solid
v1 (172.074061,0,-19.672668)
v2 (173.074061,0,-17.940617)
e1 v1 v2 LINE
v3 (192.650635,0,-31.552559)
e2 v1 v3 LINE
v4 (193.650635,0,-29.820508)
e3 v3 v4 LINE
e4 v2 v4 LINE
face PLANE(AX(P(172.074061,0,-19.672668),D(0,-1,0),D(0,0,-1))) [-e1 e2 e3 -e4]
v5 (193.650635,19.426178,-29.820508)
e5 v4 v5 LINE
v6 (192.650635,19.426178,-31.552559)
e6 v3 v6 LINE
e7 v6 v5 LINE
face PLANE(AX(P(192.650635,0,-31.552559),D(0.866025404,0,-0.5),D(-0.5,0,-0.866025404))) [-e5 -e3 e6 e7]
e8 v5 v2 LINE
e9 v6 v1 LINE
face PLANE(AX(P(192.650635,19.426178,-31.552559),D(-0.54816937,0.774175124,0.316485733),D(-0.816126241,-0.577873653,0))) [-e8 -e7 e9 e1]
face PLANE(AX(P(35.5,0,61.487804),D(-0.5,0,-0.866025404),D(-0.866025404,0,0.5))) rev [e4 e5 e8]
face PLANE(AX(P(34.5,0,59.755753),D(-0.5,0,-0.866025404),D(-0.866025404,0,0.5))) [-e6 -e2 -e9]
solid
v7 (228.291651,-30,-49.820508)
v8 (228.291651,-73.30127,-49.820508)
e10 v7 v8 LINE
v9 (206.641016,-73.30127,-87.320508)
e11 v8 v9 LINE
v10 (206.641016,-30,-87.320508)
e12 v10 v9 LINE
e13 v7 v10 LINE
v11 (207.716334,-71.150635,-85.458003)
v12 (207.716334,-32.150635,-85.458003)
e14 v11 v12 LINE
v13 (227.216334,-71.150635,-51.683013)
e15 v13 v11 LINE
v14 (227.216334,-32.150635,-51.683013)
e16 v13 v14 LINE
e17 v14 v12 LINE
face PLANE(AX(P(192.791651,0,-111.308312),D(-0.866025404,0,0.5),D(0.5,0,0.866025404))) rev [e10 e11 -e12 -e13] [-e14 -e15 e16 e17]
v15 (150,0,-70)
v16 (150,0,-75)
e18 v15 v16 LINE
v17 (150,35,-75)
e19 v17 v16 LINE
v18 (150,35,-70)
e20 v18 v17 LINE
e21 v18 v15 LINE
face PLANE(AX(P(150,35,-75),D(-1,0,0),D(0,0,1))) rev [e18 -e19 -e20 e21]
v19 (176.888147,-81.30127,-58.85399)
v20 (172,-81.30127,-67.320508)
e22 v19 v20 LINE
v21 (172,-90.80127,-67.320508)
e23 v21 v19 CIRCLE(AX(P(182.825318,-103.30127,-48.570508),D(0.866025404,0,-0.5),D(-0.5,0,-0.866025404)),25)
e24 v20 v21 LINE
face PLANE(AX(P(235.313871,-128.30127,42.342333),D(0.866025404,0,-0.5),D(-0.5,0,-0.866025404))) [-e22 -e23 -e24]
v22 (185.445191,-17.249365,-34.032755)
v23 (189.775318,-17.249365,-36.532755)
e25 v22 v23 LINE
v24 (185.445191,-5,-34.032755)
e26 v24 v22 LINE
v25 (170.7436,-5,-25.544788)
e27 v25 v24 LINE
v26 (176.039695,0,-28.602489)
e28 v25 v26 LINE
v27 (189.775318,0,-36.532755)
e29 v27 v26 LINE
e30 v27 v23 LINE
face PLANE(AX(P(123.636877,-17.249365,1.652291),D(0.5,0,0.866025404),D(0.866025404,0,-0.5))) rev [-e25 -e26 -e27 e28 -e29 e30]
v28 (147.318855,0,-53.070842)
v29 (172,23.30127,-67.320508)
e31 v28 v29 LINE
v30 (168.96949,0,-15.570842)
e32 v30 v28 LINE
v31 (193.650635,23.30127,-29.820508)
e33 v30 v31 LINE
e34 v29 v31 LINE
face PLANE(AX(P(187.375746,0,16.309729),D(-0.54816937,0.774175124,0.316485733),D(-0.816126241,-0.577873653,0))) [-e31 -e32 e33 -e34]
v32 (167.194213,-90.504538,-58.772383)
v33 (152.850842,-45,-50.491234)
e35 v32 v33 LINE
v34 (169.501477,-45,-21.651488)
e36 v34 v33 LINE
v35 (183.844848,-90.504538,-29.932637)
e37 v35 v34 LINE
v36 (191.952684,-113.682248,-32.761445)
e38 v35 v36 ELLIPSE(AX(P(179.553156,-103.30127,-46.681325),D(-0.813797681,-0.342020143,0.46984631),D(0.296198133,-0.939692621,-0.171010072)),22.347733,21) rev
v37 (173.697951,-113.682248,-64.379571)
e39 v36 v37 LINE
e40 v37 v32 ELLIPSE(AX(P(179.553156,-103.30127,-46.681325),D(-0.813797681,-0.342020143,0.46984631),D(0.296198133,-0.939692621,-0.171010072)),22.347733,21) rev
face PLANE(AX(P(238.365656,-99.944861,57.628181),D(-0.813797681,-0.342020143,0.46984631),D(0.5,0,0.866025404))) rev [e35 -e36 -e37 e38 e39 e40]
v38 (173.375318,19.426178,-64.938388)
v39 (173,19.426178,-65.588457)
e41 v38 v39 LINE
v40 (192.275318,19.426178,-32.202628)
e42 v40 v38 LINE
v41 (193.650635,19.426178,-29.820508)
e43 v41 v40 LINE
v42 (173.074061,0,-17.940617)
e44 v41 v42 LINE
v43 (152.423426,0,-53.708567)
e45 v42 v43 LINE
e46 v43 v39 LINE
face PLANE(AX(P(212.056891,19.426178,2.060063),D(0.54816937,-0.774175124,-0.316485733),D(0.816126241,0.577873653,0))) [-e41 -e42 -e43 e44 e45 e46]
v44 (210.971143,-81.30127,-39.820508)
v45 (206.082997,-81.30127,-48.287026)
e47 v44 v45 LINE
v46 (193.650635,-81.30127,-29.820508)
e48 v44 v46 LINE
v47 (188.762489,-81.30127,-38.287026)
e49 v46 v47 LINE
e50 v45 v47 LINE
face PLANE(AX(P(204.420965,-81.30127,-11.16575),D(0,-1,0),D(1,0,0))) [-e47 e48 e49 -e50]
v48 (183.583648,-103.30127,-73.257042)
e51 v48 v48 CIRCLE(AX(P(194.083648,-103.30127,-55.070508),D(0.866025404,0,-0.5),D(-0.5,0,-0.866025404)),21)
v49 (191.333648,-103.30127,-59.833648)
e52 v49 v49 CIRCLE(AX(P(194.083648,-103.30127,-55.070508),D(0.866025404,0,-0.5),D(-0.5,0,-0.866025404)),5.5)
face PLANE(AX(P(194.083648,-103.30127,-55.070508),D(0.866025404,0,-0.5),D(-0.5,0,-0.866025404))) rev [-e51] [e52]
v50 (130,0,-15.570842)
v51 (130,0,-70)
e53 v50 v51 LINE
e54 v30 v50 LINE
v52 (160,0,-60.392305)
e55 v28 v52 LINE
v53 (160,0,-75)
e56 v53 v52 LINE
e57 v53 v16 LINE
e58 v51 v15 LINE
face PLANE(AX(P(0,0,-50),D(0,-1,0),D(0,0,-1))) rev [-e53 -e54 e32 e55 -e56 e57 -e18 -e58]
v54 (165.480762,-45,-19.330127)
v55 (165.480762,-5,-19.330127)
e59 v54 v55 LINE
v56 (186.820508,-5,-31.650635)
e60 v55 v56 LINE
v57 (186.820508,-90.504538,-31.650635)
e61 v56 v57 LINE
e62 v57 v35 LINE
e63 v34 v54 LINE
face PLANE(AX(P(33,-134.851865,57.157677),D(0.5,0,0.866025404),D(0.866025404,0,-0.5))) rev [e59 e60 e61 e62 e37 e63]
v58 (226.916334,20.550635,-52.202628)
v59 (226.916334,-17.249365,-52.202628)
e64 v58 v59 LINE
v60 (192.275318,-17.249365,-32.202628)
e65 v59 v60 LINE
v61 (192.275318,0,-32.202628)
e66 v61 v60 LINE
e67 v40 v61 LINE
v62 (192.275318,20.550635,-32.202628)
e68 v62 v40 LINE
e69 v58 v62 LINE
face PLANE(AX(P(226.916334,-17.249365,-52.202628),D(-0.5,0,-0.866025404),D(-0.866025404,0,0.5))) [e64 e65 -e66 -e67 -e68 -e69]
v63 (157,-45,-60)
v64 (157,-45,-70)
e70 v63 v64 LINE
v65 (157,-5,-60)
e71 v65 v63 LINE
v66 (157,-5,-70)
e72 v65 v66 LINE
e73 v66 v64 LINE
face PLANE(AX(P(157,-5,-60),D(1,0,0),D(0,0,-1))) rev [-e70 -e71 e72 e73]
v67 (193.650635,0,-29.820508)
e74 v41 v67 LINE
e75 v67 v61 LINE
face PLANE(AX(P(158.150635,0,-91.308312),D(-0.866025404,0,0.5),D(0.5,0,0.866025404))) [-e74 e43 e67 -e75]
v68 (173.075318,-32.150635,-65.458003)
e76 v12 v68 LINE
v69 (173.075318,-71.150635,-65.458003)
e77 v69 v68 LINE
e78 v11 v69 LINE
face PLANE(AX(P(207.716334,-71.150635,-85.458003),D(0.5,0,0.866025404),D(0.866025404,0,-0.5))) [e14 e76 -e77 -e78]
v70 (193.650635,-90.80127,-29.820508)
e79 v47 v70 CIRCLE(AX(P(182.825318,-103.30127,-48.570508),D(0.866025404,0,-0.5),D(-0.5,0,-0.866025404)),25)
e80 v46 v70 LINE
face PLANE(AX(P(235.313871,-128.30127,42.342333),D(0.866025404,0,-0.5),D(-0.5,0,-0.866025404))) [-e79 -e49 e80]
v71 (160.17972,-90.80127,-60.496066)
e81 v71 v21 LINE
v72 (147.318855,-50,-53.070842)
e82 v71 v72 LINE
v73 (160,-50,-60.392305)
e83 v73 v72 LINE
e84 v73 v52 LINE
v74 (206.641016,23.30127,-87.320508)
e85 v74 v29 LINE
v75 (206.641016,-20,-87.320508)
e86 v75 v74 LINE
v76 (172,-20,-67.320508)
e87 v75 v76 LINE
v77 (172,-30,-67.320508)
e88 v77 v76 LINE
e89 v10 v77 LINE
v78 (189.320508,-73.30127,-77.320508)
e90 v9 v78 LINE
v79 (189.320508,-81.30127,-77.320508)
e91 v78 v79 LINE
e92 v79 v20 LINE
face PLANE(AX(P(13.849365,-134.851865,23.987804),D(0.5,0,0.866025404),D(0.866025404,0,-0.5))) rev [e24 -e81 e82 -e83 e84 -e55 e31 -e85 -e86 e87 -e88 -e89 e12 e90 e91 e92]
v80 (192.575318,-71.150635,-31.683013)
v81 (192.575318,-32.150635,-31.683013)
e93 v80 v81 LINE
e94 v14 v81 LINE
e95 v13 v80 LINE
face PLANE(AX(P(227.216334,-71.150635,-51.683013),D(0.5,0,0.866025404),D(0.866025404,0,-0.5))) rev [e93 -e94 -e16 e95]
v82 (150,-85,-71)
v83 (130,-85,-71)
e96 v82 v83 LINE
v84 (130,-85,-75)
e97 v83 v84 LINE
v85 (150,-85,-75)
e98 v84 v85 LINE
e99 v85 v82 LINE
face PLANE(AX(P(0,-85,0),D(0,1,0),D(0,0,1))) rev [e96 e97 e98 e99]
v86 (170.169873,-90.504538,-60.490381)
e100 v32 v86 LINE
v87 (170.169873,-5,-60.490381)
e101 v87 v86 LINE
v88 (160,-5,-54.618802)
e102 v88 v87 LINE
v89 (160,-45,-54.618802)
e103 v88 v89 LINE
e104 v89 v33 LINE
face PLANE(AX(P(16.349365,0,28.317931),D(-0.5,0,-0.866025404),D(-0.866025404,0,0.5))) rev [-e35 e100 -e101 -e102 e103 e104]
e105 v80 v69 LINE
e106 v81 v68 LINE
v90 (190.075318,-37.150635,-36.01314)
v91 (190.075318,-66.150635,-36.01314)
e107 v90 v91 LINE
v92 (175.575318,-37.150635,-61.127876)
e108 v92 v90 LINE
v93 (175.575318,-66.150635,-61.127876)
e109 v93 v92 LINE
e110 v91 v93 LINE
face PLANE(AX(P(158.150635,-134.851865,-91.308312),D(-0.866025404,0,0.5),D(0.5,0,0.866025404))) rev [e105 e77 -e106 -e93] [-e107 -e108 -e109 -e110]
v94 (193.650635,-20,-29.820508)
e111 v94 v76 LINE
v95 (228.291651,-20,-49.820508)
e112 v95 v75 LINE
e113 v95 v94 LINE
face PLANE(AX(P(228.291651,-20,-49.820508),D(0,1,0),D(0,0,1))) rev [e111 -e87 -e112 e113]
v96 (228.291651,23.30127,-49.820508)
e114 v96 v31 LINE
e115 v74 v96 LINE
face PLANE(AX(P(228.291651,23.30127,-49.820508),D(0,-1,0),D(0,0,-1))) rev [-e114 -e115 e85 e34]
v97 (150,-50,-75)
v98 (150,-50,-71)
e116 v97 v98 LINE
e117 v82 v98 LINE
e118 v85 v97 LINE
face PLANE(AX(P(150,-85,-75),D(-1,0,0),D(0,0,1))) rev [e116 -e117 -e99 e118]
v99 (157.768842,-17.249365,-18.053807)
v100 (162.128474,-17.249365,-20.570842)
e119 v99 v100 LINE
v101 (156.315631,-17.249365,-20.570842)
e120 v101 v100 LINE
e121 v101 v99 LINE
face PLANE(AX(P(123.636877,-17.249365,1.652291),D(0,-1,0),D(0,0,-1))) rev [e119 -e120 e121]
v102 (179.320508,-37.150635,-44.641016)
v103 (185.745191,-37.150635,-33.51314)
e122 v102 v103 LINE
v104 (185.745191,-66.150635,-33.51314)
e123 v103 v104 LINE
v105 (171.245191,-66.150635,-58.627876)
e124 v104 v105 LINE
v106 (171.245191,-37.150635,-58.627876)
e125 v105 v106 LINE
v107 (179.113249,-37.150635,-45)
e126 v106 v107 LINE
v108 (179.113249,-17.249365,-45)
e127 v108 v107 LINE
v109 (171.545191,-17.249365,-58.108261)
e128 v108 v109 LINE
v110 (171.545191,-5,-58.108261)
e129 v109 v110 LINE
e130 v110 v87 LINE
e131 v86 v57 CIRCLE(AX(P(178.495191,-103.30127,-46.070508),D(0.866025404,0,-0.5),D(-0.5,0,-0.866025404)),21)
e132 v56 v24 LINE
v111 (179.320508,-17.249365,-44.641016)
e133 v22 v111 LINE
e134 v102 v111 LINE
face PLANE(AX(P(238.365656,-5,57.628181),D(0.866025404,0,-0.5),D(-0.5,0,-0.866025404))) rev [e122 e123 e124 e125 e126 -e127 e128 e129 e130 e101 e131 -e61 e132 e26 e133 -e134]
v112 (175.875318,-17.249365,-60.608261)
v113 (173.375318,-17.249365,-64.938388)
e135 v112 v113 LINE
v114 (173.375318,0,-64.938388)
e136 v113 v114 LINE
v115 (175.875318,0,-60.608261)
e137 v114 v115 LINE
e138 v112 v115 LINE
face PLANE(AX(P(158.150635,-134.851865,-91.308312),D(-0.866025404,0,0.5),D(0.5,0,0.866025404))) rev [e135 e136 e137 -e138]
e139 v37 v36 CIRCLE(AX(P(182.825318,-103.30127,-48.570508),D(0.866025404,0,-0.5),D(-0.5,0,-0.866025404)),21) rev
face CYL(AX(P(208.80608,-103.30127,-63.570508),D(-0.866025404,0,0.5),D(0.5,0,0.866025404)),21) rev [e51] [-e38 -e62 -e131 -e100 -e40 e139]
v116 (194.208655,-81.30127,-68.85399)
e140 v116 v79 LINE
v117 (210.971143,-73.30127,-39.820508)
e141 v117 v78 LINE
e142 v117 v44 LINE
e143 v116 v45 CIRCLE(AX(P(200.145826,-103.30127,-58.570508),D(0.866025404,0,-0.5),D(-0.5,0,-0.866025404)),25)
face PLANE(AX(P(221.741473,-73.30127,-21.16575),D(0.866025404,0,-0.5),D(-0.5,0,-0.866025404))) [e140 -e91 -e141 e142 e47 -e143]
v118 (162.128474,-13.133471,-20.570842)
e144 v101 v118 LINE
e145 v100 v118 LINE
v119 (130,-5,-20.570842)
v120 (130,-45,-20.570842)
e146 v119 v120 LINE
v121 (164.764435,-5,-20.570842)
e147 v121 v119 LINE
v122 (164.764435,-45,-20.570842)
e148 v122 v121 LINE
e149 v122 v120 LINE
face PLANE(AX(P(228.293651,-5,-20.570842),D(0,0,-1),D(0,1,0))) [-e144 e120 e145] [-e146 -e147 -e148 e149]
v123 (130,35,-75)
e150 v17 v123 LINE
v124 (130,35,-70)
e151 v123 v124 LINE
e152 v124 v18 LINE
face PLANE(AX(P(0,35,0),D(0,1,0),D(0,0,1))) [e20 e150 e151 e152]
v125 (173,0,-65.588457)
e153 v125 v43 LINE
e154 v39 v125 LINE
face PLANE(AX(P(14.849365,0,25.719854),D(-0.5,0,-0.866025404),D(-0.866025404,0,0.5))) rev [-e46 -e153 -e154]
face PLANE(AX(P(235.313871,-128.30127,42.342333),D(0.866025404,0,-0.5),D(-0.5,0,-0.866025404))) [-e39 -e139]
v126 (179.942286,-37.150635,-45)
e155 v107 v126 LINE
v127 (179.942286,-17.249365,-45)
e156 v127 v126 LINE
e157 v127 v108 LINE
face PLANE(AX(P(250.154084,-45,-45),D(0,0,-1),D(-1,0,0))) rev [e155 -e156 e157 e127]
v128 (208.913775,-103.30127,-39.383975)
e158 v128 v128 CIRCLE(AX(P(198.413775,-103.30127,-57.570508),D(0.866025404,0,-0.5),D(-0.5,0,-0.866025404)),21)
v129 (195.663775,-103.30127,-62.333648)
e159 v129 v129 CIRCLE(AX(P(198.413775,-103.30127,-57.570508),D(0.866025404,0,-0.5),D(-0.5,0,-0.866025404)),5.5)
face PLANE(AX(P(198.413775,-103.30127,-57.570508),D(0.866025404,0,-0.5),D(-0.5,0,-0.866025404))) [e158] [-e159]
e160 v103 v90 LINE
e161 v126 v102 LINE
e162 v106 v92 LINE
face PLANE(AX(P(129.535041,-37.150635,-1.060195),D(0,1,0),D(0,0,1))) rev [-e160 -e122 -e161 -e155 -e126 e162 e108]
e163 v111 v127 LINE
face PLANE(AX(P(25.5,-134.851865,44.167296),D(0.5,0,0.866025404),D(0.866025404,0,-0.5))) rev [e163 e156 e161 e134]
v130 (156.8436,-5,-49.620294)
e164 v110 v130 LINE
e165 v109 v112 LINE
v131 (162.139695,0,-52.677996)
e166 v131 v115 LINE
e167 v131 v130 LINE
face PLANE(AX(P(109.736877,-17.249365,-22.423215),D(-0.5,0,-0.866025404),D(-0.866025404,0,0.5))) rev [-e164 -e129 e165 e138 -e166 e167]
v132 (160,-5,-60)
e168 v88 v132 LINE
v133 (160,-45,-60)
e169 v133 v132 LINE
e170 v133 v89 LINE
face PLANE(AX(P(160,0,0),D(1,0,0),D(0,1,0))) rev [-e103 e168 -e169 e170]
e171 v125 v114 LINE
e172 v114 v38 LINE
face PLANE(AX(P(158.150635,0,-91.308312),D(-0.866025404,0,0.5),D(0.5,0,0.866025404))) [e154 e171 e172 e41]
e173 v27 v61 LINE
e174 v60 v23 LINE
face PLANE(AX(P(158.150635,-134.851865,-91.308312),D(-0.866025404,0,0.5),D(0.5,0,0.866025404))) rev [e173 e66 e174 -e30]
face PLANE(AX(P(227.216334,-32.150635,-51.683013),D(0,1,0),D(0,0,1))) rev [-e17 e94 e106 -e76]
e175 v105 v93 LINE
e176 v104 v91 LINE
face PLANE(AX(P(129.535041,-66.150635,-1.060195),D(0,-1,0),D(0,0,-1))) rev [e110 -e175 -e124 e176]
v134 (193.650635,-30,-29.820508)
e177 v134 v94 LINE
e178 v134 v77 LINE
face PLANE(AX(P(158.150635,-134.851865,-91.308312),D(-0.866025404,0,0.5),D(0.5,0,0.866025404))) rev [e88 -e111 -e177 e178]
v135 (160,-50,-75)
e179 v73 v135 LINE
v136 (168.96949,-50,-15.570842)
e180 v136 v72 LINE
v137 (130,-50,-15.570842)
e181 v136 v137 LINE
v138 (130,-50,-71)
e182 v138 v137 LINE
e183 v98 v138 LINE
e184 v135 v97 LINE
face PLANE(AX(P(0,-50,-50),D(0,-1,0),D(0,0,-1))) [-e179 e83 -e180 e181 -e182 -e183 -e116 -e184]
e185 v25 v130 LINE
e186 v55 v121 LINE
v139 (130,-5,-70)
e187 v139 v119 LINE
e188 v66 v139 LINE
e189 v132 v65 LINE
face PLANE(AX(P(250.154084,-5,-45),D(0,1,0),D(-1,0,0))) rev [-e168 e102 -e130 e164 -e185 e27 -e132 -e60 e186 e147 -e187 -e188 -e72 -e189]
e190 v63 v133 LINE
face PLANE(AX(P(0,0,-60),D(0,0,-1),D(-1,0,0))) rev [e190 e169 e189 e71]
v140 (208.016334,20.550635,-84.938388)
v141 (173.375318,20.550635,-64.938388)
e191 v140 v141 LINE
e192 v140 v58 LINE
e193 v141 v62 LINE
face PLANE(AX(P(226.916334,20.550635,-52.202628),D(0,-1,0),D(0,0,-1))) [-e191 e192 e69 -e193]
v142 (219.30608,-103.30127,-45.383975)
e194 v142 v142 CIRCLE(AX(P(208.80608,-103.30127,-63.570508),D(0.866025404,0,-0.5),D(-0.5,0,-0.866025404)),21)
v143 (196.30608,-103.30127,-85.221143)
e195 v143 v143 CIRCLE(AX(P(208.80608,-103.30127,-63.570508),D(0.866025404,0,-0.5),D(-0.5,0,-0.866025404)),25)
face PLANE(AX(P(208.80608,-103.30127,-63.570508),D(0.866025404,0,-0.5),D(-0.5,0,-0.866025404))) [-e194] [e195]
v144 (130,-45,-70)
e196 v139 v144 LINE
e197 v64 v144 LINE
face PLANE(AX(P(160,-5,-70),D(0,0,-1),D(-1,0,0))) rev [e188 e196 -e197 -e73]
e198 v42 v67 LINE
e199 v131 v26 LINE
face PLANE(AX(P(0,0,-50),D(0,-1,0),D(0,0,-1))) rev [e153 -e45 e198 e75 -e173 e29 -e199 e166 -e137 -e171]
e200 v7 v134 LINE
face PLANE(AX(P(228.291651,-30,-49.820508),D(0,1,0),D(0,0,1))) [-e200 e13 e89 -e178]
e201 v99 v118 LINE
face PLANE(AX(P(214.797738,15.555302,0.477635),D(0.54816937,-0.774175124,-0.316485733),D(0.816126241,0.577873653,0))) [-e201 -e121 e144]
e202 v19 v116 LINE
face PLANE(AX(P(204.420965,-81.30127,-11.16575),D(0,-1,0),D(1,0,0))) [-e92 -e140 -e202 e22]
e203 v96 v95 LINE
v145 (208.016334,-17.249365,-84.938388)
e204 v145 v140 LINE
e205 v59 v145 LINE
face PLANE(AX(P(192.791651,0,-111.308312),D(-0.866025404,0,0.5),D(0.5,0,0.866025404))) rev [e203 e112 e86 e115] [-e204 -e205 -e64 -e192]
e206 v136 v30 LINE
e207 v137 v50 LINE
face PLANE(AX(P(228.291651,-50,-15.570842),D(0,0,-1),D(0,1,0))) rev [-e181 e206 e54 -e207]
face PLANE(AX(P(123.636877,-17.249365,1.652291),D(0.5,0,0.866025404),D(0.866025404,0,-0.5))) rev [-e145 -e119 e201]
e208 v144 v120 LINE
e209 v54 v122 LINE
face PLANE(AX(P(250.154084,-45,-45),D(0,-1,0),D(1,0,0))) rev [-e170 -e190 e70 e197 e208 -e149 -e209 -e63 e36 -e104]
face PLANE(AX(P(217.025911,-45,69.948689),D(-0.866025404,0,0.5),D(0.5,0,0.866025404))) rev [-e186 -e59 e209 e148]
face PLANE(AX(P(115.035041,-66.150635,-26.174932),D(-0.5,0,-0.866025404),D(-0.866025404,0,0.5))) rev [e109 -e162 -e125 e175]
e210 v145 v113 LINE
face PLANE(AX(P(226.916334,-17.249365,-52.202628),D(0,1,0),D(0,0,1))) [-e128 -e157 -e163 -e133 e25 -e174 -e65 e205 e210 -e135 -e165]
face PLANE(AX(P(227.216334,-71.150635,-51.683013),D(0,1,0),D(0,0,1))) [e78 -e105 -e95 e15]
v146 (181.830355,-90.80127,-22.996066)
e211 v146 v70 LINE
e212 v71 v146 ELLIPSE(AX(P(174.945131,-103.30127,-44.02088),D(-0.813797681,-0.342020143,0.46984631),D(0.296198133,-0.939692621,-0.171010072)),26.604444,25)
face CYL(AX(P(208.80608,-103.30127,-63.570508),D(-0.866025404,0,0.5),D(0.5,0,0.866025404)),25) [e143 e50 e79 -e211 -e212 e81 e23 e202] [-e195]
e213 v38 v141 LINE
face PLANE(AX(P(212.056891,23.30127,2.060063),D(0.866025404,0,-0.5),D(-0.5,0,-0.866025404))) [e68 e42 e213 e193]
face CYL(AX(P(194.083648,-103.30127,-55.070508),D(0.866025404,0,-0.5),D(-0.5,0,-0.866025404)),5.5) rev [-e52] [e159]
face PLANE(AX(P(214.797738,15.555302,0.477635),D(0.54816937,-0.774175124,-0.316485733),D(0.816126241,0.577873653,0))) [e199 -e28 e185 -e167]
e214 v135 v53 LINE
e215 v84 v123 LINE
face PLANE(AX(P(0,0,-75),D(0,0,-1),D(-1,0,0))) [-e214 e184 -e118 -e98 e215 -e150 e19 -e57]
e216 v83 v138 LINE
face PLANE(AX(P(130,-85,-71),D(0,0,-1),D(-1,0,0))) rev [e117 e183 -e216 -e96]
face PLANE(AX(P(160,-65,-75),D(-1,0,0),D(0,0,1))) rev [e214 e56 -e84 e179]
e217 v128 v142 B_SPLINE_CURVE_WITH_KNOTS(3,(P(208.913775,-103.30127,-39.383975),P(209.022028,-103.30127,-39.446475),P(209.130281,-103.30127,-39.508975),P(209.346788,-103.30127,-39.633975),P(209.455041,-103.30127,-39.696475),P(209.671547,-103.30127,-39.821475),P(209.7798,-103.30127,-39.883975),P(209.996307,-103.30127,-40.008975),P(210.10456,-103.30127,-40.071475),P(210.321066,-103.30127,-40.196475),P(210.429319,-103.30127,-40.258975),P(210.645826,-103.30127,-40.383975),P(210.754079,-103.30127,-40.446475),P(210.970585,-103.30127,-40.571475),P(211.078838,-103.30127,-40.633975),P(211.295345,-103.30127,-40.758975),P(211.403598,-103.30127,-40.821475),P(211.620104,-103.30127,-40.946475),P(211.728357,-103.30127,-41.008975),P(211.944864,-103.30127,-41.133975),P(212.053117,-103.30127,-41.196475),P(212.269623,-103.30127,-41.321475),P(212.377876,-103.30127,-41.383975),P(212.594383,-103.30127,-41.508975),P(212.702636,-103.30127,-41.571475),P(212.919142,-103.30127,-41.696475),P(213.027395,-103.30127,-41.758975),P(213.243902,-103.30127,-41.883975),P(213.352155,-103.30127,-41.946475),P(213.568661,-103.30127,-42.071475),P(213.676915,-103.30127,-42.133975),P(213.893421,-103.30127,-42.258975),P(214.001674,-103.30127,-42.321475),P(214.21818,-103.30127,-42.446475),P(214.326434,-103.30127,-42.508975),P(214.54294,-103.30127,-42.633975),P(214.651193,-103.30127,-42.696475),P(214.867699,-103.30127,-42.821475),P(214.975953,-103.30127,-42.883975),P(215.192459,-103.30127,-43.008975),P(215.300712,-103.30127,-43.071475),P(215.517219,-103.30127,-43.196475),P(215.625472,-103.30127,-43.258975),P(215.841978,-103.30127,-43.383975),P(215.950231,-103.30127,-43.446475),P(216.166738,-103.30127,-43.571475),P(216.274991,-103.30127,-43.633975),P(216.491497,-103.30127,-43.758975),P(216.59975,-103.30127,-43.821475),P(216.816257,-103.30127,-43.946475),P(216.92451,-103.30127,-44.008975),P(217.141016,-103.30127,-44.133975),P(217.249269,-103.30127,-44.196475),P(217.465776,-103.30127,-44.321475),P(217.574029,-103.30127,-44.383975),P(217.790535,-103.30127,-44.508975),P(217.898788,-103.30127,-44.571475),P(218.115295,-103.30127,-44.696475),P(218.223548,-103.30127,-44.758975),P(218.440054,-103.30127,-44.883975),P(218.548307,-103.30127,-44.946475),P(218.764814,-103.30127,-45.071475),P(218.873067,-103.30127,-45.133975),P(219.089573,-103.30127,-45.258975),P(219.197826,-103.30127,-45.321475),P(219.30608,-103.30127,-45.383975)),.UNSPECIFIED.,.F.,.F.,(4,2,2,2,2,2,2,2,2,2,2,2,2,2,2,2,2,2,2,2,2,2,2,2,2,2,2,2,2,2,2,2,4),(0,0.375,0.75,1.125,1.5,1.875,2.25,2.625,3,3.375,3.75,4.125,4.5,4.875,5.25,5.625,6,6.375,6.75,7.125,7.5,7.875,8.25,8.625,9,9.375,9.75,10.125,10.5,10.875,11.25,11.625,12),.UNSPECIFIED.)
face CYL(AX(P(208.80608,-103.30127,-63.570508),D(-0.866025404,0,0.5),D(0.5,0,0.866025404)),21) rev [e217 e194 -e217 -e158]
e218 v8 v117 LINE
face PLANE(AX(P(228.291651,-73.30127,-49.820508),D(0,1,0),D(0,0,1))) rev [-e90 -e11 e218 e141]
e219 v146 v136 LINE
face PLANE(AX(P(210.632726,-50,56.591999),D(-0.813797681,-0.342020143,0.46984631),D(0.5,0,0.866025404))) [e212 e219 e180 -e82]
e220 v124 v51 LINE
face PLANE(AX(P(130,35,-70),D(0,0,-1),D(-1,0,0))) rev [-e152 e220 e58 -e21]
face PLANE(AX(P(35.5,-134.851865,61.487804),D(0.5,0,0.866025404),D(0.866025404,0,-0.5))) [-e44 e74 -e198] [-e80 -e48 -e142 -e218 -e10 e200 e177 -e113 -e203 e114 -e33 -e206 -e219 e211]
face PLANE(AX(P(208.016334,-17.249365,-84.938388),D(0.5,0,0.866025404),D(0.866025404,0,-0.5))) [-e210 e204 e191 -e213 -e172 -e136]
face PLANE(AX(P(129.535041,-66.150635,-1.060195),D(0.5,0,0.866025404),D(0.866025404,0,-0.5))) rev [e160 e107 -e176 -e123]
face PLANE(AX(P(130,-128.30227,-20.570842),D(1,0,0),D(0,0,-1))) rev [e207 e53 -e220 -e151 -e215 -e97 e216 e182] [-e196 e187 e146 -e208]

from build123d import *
from build123d.topology import SkipClean

# Parameters (mm, degrees)
SKETCH_1_W                         = 142
SKETCH_1_H                         = 50
EXTRUDE_1_DEPTH                    = 50
EXTRUDE_2_DEPTH                    = 50
SKETCH_3_W                         = 43.301270189
SKETCH_3_H                         = 43.301270189
SKETCH_3_W_2                       = 39
SKETCH_3_H_2                       = 39
EXTRUDE_1229_DEPTH                 = 40
SKETCH_4_W                         = 43.301270189
SKETCH_4_H                         = 43.301270189
SKETCH_4_W_2                       = 37.8
SKETCH_4_H_2                       = 37.8
EXTRUDE_1555_DEPTH                 = 40
SKETCH_6_R                         = 25
SKETCH_6_R_2                       = 21
EXTRUDE_5_DEPTH                    = 30
EXTRUDE_START                      = -12
SKETCH_8_R                         = 21
SKETCH_8_R_2                       = 5.5
EXTRUDE_6_DEPTH                    = 5
EXTRUDE_START_2                    = -43.30127
EXTRUDE_7_DEPTH                    = 43.30127
EXTRUDE_10_REACH                   = 275.562
SKETCH_10_W                        = 20
SKETCH_10_H                        = 8
EXTRUDE_11_REACH                   = 275.562
EXTRUDE_12_DEPTH                   = 2
EXTRUDE_13_DEPTH                   = 2
CUT_EXTRUDE_1_DEPTH                = 249.328501215
EXTRUDE_14_REACH                   = 225.182
CUT_EXTRUDE_2_REACH                = 278.049
SKETCH_17_W                        = 40
SKETCH_17_H                        = 40
CUT_EXTRUDE_START                  = -5
CUT_EXTRUDE_3_DEPTH                = 33.301270189
CUT_EXTRUDE_4_REACH                = 230.182
CUT_EXTRUDE_4_OFFSET_FROM_SURFACE  = 5
SKETCH_20_W                        = 27.8
SKETCH_20_H                        = 30
CUT_EXTRUDE_5_REACH                = 230.182
CUT_EXTRUDE_5_OFFSET_FROM_SURFACE  = 5
SKETCH_22_W                        = 29
SKETCH_22_H                        = 29
CUT_EXTRUDE_START_2                = -19.776530706
CUT_EXTRUDE_6_OUTLINE_R            = 5.5
CUT_EXTRUDE_6_DEPTH                = 1.776530706
CUT_EXTRUDE_START_3                = 177.616623489
CUT_EXTRUDE_6_2_OUTLINE_R          = 5.5
CUT_EXTRUDE_6_2_DEPTH              = 3.223469294
CUT_EXTRUDE_START_4                = 129
CUT_EXTRUDE_6_3_OUTLINE_W          = 14
CUT_EXTRUDE_6_3_OUTLINE_H          = 14
CUT_EXTRUDE_6_3_DEPTH              = 3.721874706
CUT_EXTRUDE_7_REACH                = 225.182
SKETCH_24_R                        = 21
EXTRUDE_START_3                    = -50
SKETCH_28_W                        = 40
SKETCH_28_H                        = 60
EXTRUDE_15_DEPTH                   = 25
SKETCH_28_H_2                      = 35
EXTRUDE_15_2_DEPTH                 = 25
EXTRUDE_16_REACH                   = 278.049
SKETCH_29_W                        = 25
SKETCH_29_H                        = 50
SKETCH_30_W                        = 25
SKETCH_30_H                        = 40
CUT_EXTRUDE_8_DEPTH                = 160
SKETCH_31_W                        = 15.570842249
SKETCH_31_H                        = 50
CUT_EXTRUDE_9_DEPTH                = 277.049207735
EXTRUDE_17_REACH                   = 278.049
SKETCH_32_W                        = 5
SKETCH_32_H                        = 40
SKETCH_33_W                        = 40
SKETCH_33_H                        = 30
CUT_EXTRUDE_10_DEPTH               = 5
SKETCH_34_W                        = 40
SKETCH_34_H                        = 34.429157751
CUT_EXTRUDE_12_DEPTH               = 5
CUT_EXTRUDE_15_REACH               = 280.632
CUT_EXTRUDE_15_OFFSET_FROM_SURFACE = 5
SKETCH_37_W                        = 15.381197846
SKETCH_37_H                        = 25
EXTRUDE_18_DEPTH                   = 20
CHAMFER_1_SIZE                     = 1
CUT_EXTRUDE_16_DEPTH               = 277.049207735
CUT_EXTRUDE_16_DEPTH_BACK          = 277.049207735
SKETCH_38_W                        = 168.693453403
SKETCH_38_H                        = 59.429157751
SKETCH_39_W                        = 20
SKETCH_39_H                        = 5
EXTRUDE_19_DEPTH                   = 35
SKETCH_40_W                        = 20
SKETCH_40_H                        = 4
EXTRUDE_20_DEPTH                   = 35
CUT_EXTRUDE_17_DEPTH               = 65
SKETCH_42_W                        = 3
SKETCH_42_H                        = 40
EXTRUDE_21_DEPTH                   = 10


with BuildPart() as part:
    # 草图1 → 凸台-拉伸1 (new body)
    with BuildSketch(Plane.XY):
        with Locations((71, -25)):
            Rectangle(SKETCH_1_W, SKETCH_1_H)
    extrude(amount=-EXTRUDE_1_DEPTH)

    # 草图2 → 凸台-拉伸2 (add)
    with BuildSketch(Plane(origin=(0, 0, 0), x_dir=(1, 0, 0), z_dir=(0, 1, 0))):
        Polygon((172, 67.320508076), (142, 50), (142, 0), (193.650635095, 29.820508076), align=None)
    extrude(amount=-EXTRUDE_2_DEPTH)

    # 草图3 → Extrude 1229 (add)
    with BuildSketch(Plane(origin=(158.150635095, 0, -91.308311744), x_dir=(-0.5000000000000012, 0, -0.866025403784438), z_dir=(0.8660254037844379, 0, -0.5000000000000011))):
        with Locations((-49.349364906, -51.650635095)):
            Rectangle(SKETCH_3_W, SKETCH_3_H)
        with Locations((-49.349364905, -51.650635095)):
            Rectangle(SKETCH_3_W_2, SKETCH_3_H_2, mode=Mode.SUBTRACT)
    extrude(amount=EXTRUDE_1229_DEPTH)

    # 草图4 → Extrude 1555 (add)
    with BuildSketch(Plane(origin=(158.150635095, 0, -91.308311744), x_dir=(-0.5000000000000012, 0, -0.866025403784438), z_dir=(0.8660254037844379, 0, -0.5000000000000011))):
        with Locations((-49.349364906, 1.650635095)):
            Rectangle(SKETCH_4_W, SKETCH_4_H)
        with Locations((-49.349364905, 1.650635095)):
            Rectangle(SKETCH_4_W_2, SKETCH_4_H_2, mode=Mode.SUBTRACT)
    extrude(amount=EXTRUDE_1555_DEPTH)



with BuildPart() as body_2:
    # 草图6 → 凸台-拉伸5 (new body)
    with BuildSketch(Plane(origin=(158.150635095, 0, -91.308311744), x_dir=(-0.5000000000000012, 0, -0.866025403784438), z_dir=(0.8660254037844379, 0, -0.5000000000000011))):
        with Locations(Location((-49.349364905, -103.301270189, 0), (0, 0, 180))):
            Circle(SKETCH_6_R)
        with Locations(Location((-49.349364905, -103.301270189, 0), (0, 0, 180))):
            Circle(SKETCH_6_R_2, mode=Mode.SUBTRACT)
    extrude(amount=EXTRUDE_5_DEPTH)

    # 草图8 → 凸台-拉伸6 (add)
    with BuildSketch(Plane(origin=(184.131397208, 0, -106.308311744), x_dir=(-0.5000000000000014, 0, -0.8660254037844379), z_dir=(0.8660254037844378, 0, -0.5000000000000013)).offset(EXTRUDE_START)):
        with Locations(Location((-49.349364905, -103.301270189, 0), (0, 0, 180))):
            Circle(SKETCH_8_R)
        with Locations((-49.349364905, -103.301270189)):
            Circle(SKETCH_8_R_2, mode=Mode.SUBTRACT)
    extrude(amount=-EXTRUDE_6_DEPTH)


with BuildPart() as part_1:
    with SkipClean():  # the faces are left unmerged after this step: merging them gives an invalid solid
        add(part.part)

        add(body_2.part)  # 凸台-拉伸7 merges body 2
        # 草图9 → 凸台-拉伸7 (add)
        with BuildSketch(Plane(origin=(13.849364905, 0, 23.987803669), x_dir=(-0.866025403784438, 0, 0.5000000000000012), z_dir=(-0.5000000000000012, 0, -0.866025403784438)).offset(EXTRUDE_START_2)):
            Polygon((-154.117291835, -50), (-182.616623489, -128.301270189), (-182.616623489, -50), align=None)
        extrude(amount=EXTRUDE_7_DEPTH)

    # 凸台-拉伸10: up to this face of the body (flat: up to its plane)
    extrude_10_end = Plane(part_1.part.faces().sort_by_distance((191.011477977, -25, -28.296790003))[0])
    # 草图10 → 凸台-拉伸10 (add, up to the picked face)
    with BuildSketch(Plane(origin=(13.849364905, 0, 23.987803669), x_dir=(-0.866025403784438, 0, 0.5000000000000012), z_dir=(-0.5000000000000012, 0, -0.866025403784438)), mode=Mode.PRIVATE) as extrude_10_sk1:
        with Locations((-192.616623489, -77.301270189)):
            Rectangle(SKETCH_10_W, SKETCH_10_H)
    extrude_10_tool1 = split(extrude(extrude_10_sk1.sketch, amount=-EXTRUDE_10_REACH, mode=Mode.PRIVATE), bisect_by=extrude_10_end, keep=Keep.BOTH, mode=Mode.PRIVATE)
    add(extrude_10_tool1.solids().sort_by(Axis((180.660254, -77.30127, -72.320508), (0.5000000000000012, 0, 0.866025403784438)))[0])

    # 凸台-拉伸11: up to this face of the body (flat: up to its plane)
    extrude_11_end = Plane(part_1.part.faces().sort_by_distance((191.011477977, -25, -28.296790003))[0])
    # 草图11 → 凸台-拉伸11 (add, up to the picked face)
    with BuildSketch(Plane(origin=(13.849364905, 0, 23.987803669), x_dir=(-0.866025403784438, 0, 0.5000000000000012), z_dir=(-0.5000000000000012, 0, -0.866025403784438)), mode=Mode.PRIVATE) as extrude_11_sk1:
        Polygon((-154.117291835, 0), (-182.616623489, 23.301270189), (-182.616623489, 19.42617797), (-158.856841973, 0), align=None)
    extrude_11_tool1 = split(extrude(extrude_11_sk1.sketch, amount=-EXTRUDE_11_REACH, mode=Mode.PRIVATE), bisect_by=extrude_11_end, keep=Keep.BOTH, mode=Mode.PRIVATE)
    add(extrude_11_tool1.solids().sort_by(Axis((160.654549, 10.711149, -60.770209), (0.5000000000000012, 0, 0.866025403784438)))[0])

    # 草图12 → 凸台-拉伸12 (add)
    with SkipClean():  # the faces are left unmerged after this step: merging them gives an invalid solid
        with BuildSketch(Plane(origin=(13.849364905, 0, 23.987803669), x_dir=(-0.866025403784438, 0, 0.5000000000000012), z_dir=(-0.5000000000000012, 0, -0.866025403784438))):
            Polygon((-182.616623489, 19.42617797), (-182.616623489, 0), (-158.856841973, 0), align=None)
        extrude(amount=-EXTRUDE_12_DEPTH)

    # 草图15 → 切除-拉伸1 (cut, through all)
    with SkipClean():  # the faces are left unmerged after this step: merging them gives an invalid solid
        with BuildSketch(Plane(origin=(184.131397208, 0, -106.308311744), x_dir=(-0.5000000000000014, 0, -0.8660254037844379), z_dir=(0.8660254037844378, 0, -0.5000000000000013))):
            with BuildLine():
                Line((-49.349364905, -128.301270189), (-27.698729811, -128.301270189))
                Line((-27.698729811, -128.301270189), (-27.698729811, -115.801270189))
                ThreePointArc((-27.698729811, -115.801270189), (-36.849364905, -124.951905284), (-49.349364905, -128.301270189))
            make_face()
            with BuildLine():
                Line((-71, -128.301270189), (-49.349364905, -128.301270189))
                ThreePointArc((-49.349364905, -128.301270189), (-61.849364905, -124.951905284), (-71, -115.801270189))
                Line((-71, -115.801270189), (-71, -128.301270189))
            make_face()
        extrude(amount=-CUT_EXTRUDE_1_DEPTH, mode=Mode.SUBTRACT)

    # 凸台-拉伸14: up to this plane
    with SkipClean():  # the faces are left unmerged after this step: merging them gives an invalid solid
        extrude_14_end = Plane(origin=(210.632725537, -50, 56.591998698), z_dir=(-0.8137976813493748, -0.3420201433256631, 0.46984631039295627))
        # 草图16 → 凸台-拉伸14 (add, up to the surface)
        with BuildSketch(Plane(origin=(158.150635095, 0, -91.308311744), x_dir=(0.5000000000000014, 0, 0.8660254037844379), z_dir=(-0.8660254037844378, 0, 0.5000000000000013)), mode=Mode.PRIVATE) as extrude_14_sk1:
            with BuildLine():
                Line((27.698729811, -115.801270189), (27.698729811, -90.801270189))
                ThreePointArc((27.698729811, -90.801270189), (24.349364905, -103.301270189), (27.698729811, -115.801270189))
            make_face()
        extrude_14_tool1 = split(extrude(extrude_14_sk1.sketch, amount=EXTRUDE_14_REACH, mode=Mode.PRIVATE), bisect_by=extrude_14_end, keep=Keep.BOTH, mode=Mode.PRIVATE)
        add(extrude_14_tool1.solids().sort_by_distance((171.326125, -103.30127, -68.487693))[0])
        # 草图16 → 凸台-拉伸14 (add, up to the surface)
        with BuildSketch(Plane(origin=(158.150635095, 0, -91.308311744), x_dir=(0.5000000000000014, 0, 0.8660254037844379), z_dir=(-0.8660254037844378, 0, 0.5000000000000013)), mode=Mode.PRIVATE) as extrude_14_sk2:
            with BuildLine():
                Line((71, -90.801270189), (71, -115.801270189))
                ThreePointArc((71, -115.801270189), (74.349364905, -103.301270189), (71, -90.801270189))
            make_face()
        extrude_14_tool2 = split(extrude(extrude_14_sk2.sketch, amount=EXTRUDE_14_REACH, mode=Mode.PRIVATE), bisect_by=extrude_14_end, keep=Keep.BOTH, mode=Mode.PRIVATE)
        add(extrude_14_tool2.solids().sort_by_distance((194.32451, -103.30127, -28.653323))[0])
    add(part_1.part.scale(1), mode=Mode.REPLACE)  # the faces are merged on a copy

    # 切除-拉伸2: up to this plane
    cut_extrude_2_end = Plane(origin=(25.5, -134.851864524, 44.167295593), z_dir=(0.5000000000000016, 0, 0.8660254037844378))
    # 草图17 → 切除-拉伸2 (cut, up to the surface)
    with BuildSketch(Plane.ZY, mode=Mode.PRIVATE) as cut_extrude_2_sk1:
        with Locations((-25, -25)):
            Rectangle(SKETCH_17_W, SKETCH_17_H)
    cut_extrude_2_tool1 = split(extrude(cut_extrude_2_sk1.sketch, amount=-CUT_EXTRUDE_2_REACH, mode=Mode.PRIVATE), bisect_by=cut_extrude_2_end, keep=Keep.BOTH, mode=Mode.PRIVATE)
    add(cut_extrude_2_tool1.solids().sort_by_distance((0, -25, -25))[0], mode=Mode.SUBTRACT)

    # 草图19 → 切除-拉伸3 (cut)
    with BuildSketch(Plane(origin=(13.849364905, 0, 23.987803669), x_dir=(-0.866025403784438, 0, 0.5000000000000012), z_dir=(-0.5000000000000012, 0, -0.866025403784438)).offset(CUT_EXTRUDE_START)):
        Polygon((-177.616623489, -5), (-177.616623489, -99.944861091), (-157.618329526, -45), (-152.975607337, -45), (-152.975607337, -5), align=None)
    extrude(amount=-CUT_EXTRUDE_3_DEPTH, mode=Mode.SUBTRACT)

    # 切除-拉伸4: up to this face of the body (flat: up to its plane, moved by the offset)
    cut_extrude_4_end = Plane(part_1.part.faces().sort_by_distance((173.037030357, 9.713088985, -41.764537293))[0]).offset(CUT_EXTRUDE_4_OFFSET_FROM_SURFACE)
    # 草图20 → 切除-拉伸4 (cut, up to the picked face)
    with BuildSketch(Plane(origin=(158.150635095, 0, -91.308311744), x_dir=(-0.5000000000000012, 0, -0.866025403784438), z_dir=(0.8660254037844379, 0, -0.5000000000000011)), mode=Mode.PRIVATE) as cut_extrude_4_sk1:
        with Locations((-49.349364905, -2.249364905)):
            Rectangle(SKETCH_20_W, SKETCH_20_H)
    cut_extrude_4_tool1 = split(extrude(cut_extrude_4_sk1.sketch, amount=-CUT_EXTRUDE_4_REACH, mode=Mode.PRIVATE), bisect_by=cut_extrude_4_end, keep=Keep.BOTH, mode=Mode.PRIVATE)
    add(cut_extrude_4_tool1.solids().sort_by(Axis((182.825318, -2.249365, -48.570508), (-0.8660254037844379, 0, 0.5000000000000011)))[0], mode=Mode.SUBTRACT)

    # 切除-拉伸5: up to this face of the body (flat: up to its plane, moved by the offset)
    cut_extrude_5_end = Plane(part_1.part.faces().sort_by_distance((169.937789639, -87.415411915, -41.129890369))[0]).offset(-CUT_EXTRUDE_5_OFFSET_FROM_SURFACE)
    # 草图22 → 切除-拉伸5 (cut, up to the picked face)
    with BuildSketch(Plane(origin=(158.150635095, 0, -91.308311744), x_dir=(-0.5000000000000012, 0, -0.866025403784438), z_dir=(0.8660254037844379, 0, -0.5000000000000011)), mode=Mode.PRIVATE) as cut_extrude_5_sk1:
        with Locations((-49.349364905, -51.650635095)):
            Rectangle(SKETCH_22_W, SKETCH_22_H)
    cut_extrude_5_tool1 = split(extrude(cut_extrude_5_sk1.sketch, amount=-CUT_EXTRUDE_5_REACH, mode=Mode.PRIVATE), bisect_by=cut_extrude_5_end, keep=Keep.BOTH, mode=Mode.PRIVATE)
    add(cut_extrude_5_tool1.solids().sort_by(Axis((182.825318, -51.650635, -48.570508), (-0.8660254037844379, 0, 0.5000000000000011)))[0], mode=Mode.SUBTRACT)

    # 切除-拉伸6: read off the stored shape, not the designer's step
    # 切除-拉伸6 outline → 切除-拉伸6 (cut)
    with BuildSketch(Plane(origin=(173.739092363, 0, -100.308311744), x_dir=(-0.5000000000000017, 0, -0.8660254037844378), z_dir=(0.8660254037844377, 0, -0.5000000000000016)).offset(CUT_EXTRUDE_START_2)):
        with Locations((-49.349364905, -103.301270189)):
            Circle(CUT_EXTRUDE_6_OUTLINE_R)
    extrude(amount=CUT_EXTRUDE_6_DEPTH, mode=Mode.SUBTRACT)

    # Cut-Extrude 6 2 outline → Cut-Extrude 6 2 (cut)
    with BuildSketch(Plane(origin=(0, 0, 0), x_dir=(0.5000000000000016, 0, 0.8660254037844377), z_dir=(0.8660254037844377, 0, -0.5000000000000018)).offset(CUT_EXTRUDE_START_3)):
        with Locations((49.349364905, 103.301270189)):
            Circle(CUT_EXTRUDE_6_2_OUTLINE_R)
    extrude(amount=CUT_EXTRUDE_6_2_DEPTH, mode=Mode.SUBTRACT)

    # Cut-Extrude 6 3 outline → Cut-Extrude 6 3 (add)
    with SkipClean():  # the faces are left unmerged after this step: merging them gives an invalid solid
        with BuildSketch(Plane(origin=(0, 0, 0), x_dir=(0.5811482890195767, -0.4789400655085298, 0.6579385076284131), z_dir=(0.8137976813493747, 0.342020143325664, -0.46984631039295593)).offset(CUT_EXTRUDE_START_4)):
            with Locations((123, 111)):
                Rectangle(CUT_EXTRUDE_6_3_OUTLINE_W, CUT_EXTRUDE_6_3_OUTLINE_H)
        extrude(amount=CUT_EXTRUDE_6_3_DEPTH)

    # 切除-拉伸7: up to this face of the body (flat: up to its plane)
    cut_extrude_7_end = Plane(part_1.part.faces().sort_by_distance((172.347083394, -80.42193919, -42.507817086))[0])
    # 草图24 → 切除-拉伸7 (cut, up to the picked face)
    with BuildSketch(Plane(origin=(158.150635095, 0, -91.308311744), x_dir=(-0.5000000000000013, 0, -0.8660254037844379), z_dir=(0.8660254037844378, 0, -0.5000000000000012)), mode=Mode.PRIVATE) as cut_extrude_7_sk1:
        with Locations(Location((-49.349364905, -103.301270189, 0), (0, 0, 209.625730133))):
            Circle(SKETCH_24_R)
    cut_extrude_7_tool1 = split(extrude(cut_extrude_7_sk1.sketch, amount=-CUT_EXTRUDE_7_REACH, mode=Mode.PRIVATE), bisect_by=cut_extrude_7_end, keep=Keep.BOTH, mode=Mode.PRIVATE)
    add(cut_extrude_7_tool1.solids().sort_by(Axis((182.825318, -103.30127, -48.570508), (-0.8660254037844378, 0, 0.5000000000000012)))[0], mode=Mode.SUBTRACT)

    # 凸台-拉伸16: up to this plane
    with SkipClean():  # the faces are left unmerged after this step: merging them gives an invalid solid
        extrude_16_end = Plane(origin=(13.849364905, -134.851864524, 23.987803669), z_dir=(0.5000000000000013, 0, 0.8660254037844379))
        # 草图29 → 凸台-拉伸16 (add, up to the surface)
        with BuildSketch(Plane.ZY, mode=Mode.PRIVATE) as extrude_16_sk1:
            with Locations((-62.5, -25)):
                Rectangle(SKETCH_29_W, SKETCH_29_H)
        extrude_16_tool1 = split(extrude(extrude_16_sk1.sketch, amount=-EXTRUDE_16_REACH, mode=Mode.PRIVATE), bisect_by=extrude_16_end, keep=Keep.BOTH, mode=Mode.PRIVATE)
        add(extrude_16_tool1.solids().sort_by_distance((0, -25, -62.5))[0])

    # 草图30 → 切除-拉伸8 (cut)
    with SkipClean():  # the faces are left unmerged after this step: merging them gives an invalid solid
        with BuildSketch(Plane.ZY):
            with Locations((-57.5, -25)):
                Rectangle(SKETCH_30_W, SKETCH_30_H)
        extrude(amount=-CUT_EXTRUDE_8_DEPTH, mode=Mode.SUBTRACT)

    # 草图31 → 切除-拉伸9 (cut, through all)
    with SkipClean():  # the faces are left unmerged after this step: merging them gives an invalid solid
        with BuildSketch(Plane.ZY):
            with Locations((-7.785421125, -25)):
                Rectangle(SKETCH_31_W, SKETCH_31_H)
        extrude(amount=-CUT_EXTRUDE_9_DEPTH, mode=Mode.SUBTRACT)

    # 凸台-拉伸17: up to this plane
    extrude_17_end = Plane(origin=(25.5, -134.851864524, 44.167295593), z_dir=(0.5000000000000016, 0, 0.8660254037844378))
    # 草图32 → 凸台-拉伸17 (add, up to the surface)
    with BuildSketch(Plane.ZY, mode=Mode.PRIVATE) as extrude_17_sk1:
        with Locations((-18.070842249, -25)):
            Rectangle(SKETCH_32_W, SKETCH_32_H)
    extrude_17_tool1 = split(extrude(extrude_17_sk1.sketch, amount=-EXTRUDE_17_REACH, mode=Mode.PRIVATE), bisect_by=extrude_17_end, keep=Keep.BOTH, mode=Mode.PRIVATE)
    add(extrude_17_tool1.solids().sort_by_distance((0, -25, -18.070842))[0])

    # 草图33 → 切除-拉伸10 (cut)
    with BuildSketch(Plane.XY.offset(-15.570842249)):
        with Locations((20, -25)):
            Rectangle(SKETCH_33_W, SKETCH_33_H)
    extrude(amount=-CUT_EXTRUDE_10_DEPTH, mode=Mode.SUBTRACT)

    # 草图34 → 切除-拉伸12 (cut)
    with BuildSketch(Plane(origin=(0, 0, 0), x_dir=(1, 0, 0), z_dir=(0, 1, 0))):
        with Locations((110, 37.785421125)):
            Rectangle(SKETCH_34_W, SKETCH_34_H)
    extrude(amount=-CUT_EXTRUDE_12_DEPTH, mode=Mode.SUBTRACT)

    # 切除-拉伸15: up to this face of the body (flat: up to its plane, moved by the offset)
    cut_extrude_15_end = Plane(part_1.part.faces().sort_by_distance((77.969126343, -25, -15.570842249))[0]).offset(-CUT_EXTRUDE_15_OFFSET_FROM_SURFACE)
    # 草图35 → 切除-拉伸15 (cut, up to the picked face)
    with BuildSketch(Plane(origin=(25.5, 0, 44.167295593), x_dir=(-0.8660254037844378, 0, 0.5000000000000016), z_dir=(-0.5000000000000016, 0, -0.8660254037844378)), mode=Mode.PRIVATE) as cut_extrude_15_sk1:
        Polygon((-152.975607337, -11.267029174), (-152.975607337, -17.249364905), (-152.975607337, -45), (-129.476275683, -45), (-129.476275683, -5), (-152.975607337, -5), align=None)
    cut_extrude_15_tool1 = split(extrude(cut_extrude_15_sk1.sketch, amount=-CUT_EXTRUDE_15_REACH, mode=Mode.PRIVATE), bisect_by=cut_extrude_15_end, keep=Keep.BOTH, mode=Mode.PRIVATE)
    add(cut_extrude_15_tool1.solids().sort_by(Axis((147.805253, -25, -26.445675), (0.5000000000000016, 0, 0.8660254037844378)))[0], mode=Mode.SUBTRACT)



with BuildPart() as body_2_2:
    # 草图14 → 凸台-拉伸13 (new body)
    with BuildSketch(Plane(origin=(35.5, 0, 61.487803669), x_dir=(0.8660254037844377, 0, -0.5000000000000018), z_dir=(0.5000000000000018, 0, 0.8660254037844377))):
        Polygon((182.616623489, 19.42617797), (158.856841973, 0), (182.616623489, 0), align=None)
    extrude(amount=-EXTRUDE_13_DEPTH)


with BuildPart() as body_3:
    # 草图28 → 凸台-拉伸15 (new body)
    with BuildSketch(Plane.XY.offset(EXTRUDE_START_3)):
        with Locations((20, 30)):
            Rectangle(SKETCH_28_W, SKETCH_28_H)
    extrude(amount=-EXTRUDE_15_DEPTH)


with BuildPart() as body_4:
    # 草图28 → Extrude 15 2 (new body)
    with BuildSketch(Plane.XY.offset(EXTRUDE_START_3)):
        with Locations((20, -67.5)):
            Rectangle(SKETCH_28_W, SKETCH_28_H_2)
    extrude(amount=-EXTRUDE_15_2_DEPTH)


with BuildPart() as part_2:
    with SkipClean():  # the faces are left unmerged after this step: merging them gives an invalid solid
        add(part_1.part)

        add(body_3.part)  # 凸台-拉伸18 merges body 3

        add(body_4.part)  # 凸台-拉伸18 merges body 4
        # 草图37 → 凸台-拉伸18 (add)
        with BuildSketch(Plane.ZY):
            with Locations((-62.309401077, 12.5)):
                Rectangle(SKETCH_37_W, SKETCH_37_H)
            with Locations((-62.309401077, -62.5)):
                Rectangle(SKETCH_37_W, SKETCH_37_H)
        extrude(amount=EXTRUDE_18_DEPTH)

    # 倒角1
    chamfer_1_edges = [part_2.edges().sort_by_distance(p)[0] for p in [
        (-20, -62.5, -70),
        (-20, -75, -62.309401077),
        (-20, -62.5, -54.618802154),
        (-20, -50, -62.309401077),
        (-20, 12.5, -70),
        (-20, 0, -62.309401077),
        (-20, 12.5, -54.618802154),
        (-20, 25, -62.309401077),
    ]]
    chamfer(chamfer_1_edges, length=CHAMFER_1_SIZE)

    # 草图38 → 切除-拉伸16 (cut, two sides: drawn at the far end of the back side and taken through both)
    with SkipClean():  # the faces are left unmerged after this step: merging them gives an invalid solid
        with BuildSketch(Plane(origin=(0, 0, 0), x_dir=(1, 0, 0), z_dir=(0, 1, 0)).offset(-CUT_EXTRUDE_16_DEPTH_BACK)):
            with Locations((45.653273298, 45.285421125)):
                Rectangle(SKETCH_38_W, SKETCH_38_H)
        extrude(amount=CUT_EXTRUDE_16_DEPTH + CUT_EXTRUDE_16_DEPTH_BACK, mode=Mode.SUBTRACT)

    # 草图39 → 凸台-拉伸19 (add)
    with SkipClean():  # the faces are left unmerged after this step: merging them gives an invalid solid
        with BuildSketch(Plane(origin=(0, 0, 0), x_dir=(1, 0, 0), z_dir=(0, 1, 0))):
            with Locations((140, 72.5)):
                Rectangle(SKETCH_39_W, SKETCH_39_H)
        extrude(amount=EXTRUDE_19_DEPTH)

    # 草图40 → 凸台-拉伸20 (add)
    with SkipClean():  # the faces are left unmerged after this step: merging them gives an invalid solid
        with BuildSketch(Plane.XZ.offset(50)):
            with Locations((140, -73)):
                Rectangle(SKETCH_40_W, SKETCH_40_H)
        extrude(amount=EXTRUDE_20_DEPTH)

    # 草图41 → 切除-拉伸17 (cut)
    with SkipClean():  # the faces are left unmerged after this step: merging them gives an invalid solid
        with BuildSketch(Plane(origin=(0, 0, 0), x_dir=(1, 0, 0), z_dir=(0, 1, 0))):
            Polygon((185.301270189, 75), (160, 75), (160, 60.392304845), align=None)
        extrude(amount=-CUT_EXTRUDE_17_DEPTH, mode=Mode.SUBTRACT)

    # 草图42 → 凸台-拉伸21 (add)
    with SkipClean():  # the faces are left unmerged after this step: merging them gives an invalid solid
        with BuildSketch(Plane.XY.offset(-70)):
            with Locations((158.5, -25)):
                Rectangle(SKETCH_42_W, SKETCH_42_H)
        extrude(amount=EXTRUDE_21_DEPTH)


solid = Compound([body_2_2.part, part_2.part])
